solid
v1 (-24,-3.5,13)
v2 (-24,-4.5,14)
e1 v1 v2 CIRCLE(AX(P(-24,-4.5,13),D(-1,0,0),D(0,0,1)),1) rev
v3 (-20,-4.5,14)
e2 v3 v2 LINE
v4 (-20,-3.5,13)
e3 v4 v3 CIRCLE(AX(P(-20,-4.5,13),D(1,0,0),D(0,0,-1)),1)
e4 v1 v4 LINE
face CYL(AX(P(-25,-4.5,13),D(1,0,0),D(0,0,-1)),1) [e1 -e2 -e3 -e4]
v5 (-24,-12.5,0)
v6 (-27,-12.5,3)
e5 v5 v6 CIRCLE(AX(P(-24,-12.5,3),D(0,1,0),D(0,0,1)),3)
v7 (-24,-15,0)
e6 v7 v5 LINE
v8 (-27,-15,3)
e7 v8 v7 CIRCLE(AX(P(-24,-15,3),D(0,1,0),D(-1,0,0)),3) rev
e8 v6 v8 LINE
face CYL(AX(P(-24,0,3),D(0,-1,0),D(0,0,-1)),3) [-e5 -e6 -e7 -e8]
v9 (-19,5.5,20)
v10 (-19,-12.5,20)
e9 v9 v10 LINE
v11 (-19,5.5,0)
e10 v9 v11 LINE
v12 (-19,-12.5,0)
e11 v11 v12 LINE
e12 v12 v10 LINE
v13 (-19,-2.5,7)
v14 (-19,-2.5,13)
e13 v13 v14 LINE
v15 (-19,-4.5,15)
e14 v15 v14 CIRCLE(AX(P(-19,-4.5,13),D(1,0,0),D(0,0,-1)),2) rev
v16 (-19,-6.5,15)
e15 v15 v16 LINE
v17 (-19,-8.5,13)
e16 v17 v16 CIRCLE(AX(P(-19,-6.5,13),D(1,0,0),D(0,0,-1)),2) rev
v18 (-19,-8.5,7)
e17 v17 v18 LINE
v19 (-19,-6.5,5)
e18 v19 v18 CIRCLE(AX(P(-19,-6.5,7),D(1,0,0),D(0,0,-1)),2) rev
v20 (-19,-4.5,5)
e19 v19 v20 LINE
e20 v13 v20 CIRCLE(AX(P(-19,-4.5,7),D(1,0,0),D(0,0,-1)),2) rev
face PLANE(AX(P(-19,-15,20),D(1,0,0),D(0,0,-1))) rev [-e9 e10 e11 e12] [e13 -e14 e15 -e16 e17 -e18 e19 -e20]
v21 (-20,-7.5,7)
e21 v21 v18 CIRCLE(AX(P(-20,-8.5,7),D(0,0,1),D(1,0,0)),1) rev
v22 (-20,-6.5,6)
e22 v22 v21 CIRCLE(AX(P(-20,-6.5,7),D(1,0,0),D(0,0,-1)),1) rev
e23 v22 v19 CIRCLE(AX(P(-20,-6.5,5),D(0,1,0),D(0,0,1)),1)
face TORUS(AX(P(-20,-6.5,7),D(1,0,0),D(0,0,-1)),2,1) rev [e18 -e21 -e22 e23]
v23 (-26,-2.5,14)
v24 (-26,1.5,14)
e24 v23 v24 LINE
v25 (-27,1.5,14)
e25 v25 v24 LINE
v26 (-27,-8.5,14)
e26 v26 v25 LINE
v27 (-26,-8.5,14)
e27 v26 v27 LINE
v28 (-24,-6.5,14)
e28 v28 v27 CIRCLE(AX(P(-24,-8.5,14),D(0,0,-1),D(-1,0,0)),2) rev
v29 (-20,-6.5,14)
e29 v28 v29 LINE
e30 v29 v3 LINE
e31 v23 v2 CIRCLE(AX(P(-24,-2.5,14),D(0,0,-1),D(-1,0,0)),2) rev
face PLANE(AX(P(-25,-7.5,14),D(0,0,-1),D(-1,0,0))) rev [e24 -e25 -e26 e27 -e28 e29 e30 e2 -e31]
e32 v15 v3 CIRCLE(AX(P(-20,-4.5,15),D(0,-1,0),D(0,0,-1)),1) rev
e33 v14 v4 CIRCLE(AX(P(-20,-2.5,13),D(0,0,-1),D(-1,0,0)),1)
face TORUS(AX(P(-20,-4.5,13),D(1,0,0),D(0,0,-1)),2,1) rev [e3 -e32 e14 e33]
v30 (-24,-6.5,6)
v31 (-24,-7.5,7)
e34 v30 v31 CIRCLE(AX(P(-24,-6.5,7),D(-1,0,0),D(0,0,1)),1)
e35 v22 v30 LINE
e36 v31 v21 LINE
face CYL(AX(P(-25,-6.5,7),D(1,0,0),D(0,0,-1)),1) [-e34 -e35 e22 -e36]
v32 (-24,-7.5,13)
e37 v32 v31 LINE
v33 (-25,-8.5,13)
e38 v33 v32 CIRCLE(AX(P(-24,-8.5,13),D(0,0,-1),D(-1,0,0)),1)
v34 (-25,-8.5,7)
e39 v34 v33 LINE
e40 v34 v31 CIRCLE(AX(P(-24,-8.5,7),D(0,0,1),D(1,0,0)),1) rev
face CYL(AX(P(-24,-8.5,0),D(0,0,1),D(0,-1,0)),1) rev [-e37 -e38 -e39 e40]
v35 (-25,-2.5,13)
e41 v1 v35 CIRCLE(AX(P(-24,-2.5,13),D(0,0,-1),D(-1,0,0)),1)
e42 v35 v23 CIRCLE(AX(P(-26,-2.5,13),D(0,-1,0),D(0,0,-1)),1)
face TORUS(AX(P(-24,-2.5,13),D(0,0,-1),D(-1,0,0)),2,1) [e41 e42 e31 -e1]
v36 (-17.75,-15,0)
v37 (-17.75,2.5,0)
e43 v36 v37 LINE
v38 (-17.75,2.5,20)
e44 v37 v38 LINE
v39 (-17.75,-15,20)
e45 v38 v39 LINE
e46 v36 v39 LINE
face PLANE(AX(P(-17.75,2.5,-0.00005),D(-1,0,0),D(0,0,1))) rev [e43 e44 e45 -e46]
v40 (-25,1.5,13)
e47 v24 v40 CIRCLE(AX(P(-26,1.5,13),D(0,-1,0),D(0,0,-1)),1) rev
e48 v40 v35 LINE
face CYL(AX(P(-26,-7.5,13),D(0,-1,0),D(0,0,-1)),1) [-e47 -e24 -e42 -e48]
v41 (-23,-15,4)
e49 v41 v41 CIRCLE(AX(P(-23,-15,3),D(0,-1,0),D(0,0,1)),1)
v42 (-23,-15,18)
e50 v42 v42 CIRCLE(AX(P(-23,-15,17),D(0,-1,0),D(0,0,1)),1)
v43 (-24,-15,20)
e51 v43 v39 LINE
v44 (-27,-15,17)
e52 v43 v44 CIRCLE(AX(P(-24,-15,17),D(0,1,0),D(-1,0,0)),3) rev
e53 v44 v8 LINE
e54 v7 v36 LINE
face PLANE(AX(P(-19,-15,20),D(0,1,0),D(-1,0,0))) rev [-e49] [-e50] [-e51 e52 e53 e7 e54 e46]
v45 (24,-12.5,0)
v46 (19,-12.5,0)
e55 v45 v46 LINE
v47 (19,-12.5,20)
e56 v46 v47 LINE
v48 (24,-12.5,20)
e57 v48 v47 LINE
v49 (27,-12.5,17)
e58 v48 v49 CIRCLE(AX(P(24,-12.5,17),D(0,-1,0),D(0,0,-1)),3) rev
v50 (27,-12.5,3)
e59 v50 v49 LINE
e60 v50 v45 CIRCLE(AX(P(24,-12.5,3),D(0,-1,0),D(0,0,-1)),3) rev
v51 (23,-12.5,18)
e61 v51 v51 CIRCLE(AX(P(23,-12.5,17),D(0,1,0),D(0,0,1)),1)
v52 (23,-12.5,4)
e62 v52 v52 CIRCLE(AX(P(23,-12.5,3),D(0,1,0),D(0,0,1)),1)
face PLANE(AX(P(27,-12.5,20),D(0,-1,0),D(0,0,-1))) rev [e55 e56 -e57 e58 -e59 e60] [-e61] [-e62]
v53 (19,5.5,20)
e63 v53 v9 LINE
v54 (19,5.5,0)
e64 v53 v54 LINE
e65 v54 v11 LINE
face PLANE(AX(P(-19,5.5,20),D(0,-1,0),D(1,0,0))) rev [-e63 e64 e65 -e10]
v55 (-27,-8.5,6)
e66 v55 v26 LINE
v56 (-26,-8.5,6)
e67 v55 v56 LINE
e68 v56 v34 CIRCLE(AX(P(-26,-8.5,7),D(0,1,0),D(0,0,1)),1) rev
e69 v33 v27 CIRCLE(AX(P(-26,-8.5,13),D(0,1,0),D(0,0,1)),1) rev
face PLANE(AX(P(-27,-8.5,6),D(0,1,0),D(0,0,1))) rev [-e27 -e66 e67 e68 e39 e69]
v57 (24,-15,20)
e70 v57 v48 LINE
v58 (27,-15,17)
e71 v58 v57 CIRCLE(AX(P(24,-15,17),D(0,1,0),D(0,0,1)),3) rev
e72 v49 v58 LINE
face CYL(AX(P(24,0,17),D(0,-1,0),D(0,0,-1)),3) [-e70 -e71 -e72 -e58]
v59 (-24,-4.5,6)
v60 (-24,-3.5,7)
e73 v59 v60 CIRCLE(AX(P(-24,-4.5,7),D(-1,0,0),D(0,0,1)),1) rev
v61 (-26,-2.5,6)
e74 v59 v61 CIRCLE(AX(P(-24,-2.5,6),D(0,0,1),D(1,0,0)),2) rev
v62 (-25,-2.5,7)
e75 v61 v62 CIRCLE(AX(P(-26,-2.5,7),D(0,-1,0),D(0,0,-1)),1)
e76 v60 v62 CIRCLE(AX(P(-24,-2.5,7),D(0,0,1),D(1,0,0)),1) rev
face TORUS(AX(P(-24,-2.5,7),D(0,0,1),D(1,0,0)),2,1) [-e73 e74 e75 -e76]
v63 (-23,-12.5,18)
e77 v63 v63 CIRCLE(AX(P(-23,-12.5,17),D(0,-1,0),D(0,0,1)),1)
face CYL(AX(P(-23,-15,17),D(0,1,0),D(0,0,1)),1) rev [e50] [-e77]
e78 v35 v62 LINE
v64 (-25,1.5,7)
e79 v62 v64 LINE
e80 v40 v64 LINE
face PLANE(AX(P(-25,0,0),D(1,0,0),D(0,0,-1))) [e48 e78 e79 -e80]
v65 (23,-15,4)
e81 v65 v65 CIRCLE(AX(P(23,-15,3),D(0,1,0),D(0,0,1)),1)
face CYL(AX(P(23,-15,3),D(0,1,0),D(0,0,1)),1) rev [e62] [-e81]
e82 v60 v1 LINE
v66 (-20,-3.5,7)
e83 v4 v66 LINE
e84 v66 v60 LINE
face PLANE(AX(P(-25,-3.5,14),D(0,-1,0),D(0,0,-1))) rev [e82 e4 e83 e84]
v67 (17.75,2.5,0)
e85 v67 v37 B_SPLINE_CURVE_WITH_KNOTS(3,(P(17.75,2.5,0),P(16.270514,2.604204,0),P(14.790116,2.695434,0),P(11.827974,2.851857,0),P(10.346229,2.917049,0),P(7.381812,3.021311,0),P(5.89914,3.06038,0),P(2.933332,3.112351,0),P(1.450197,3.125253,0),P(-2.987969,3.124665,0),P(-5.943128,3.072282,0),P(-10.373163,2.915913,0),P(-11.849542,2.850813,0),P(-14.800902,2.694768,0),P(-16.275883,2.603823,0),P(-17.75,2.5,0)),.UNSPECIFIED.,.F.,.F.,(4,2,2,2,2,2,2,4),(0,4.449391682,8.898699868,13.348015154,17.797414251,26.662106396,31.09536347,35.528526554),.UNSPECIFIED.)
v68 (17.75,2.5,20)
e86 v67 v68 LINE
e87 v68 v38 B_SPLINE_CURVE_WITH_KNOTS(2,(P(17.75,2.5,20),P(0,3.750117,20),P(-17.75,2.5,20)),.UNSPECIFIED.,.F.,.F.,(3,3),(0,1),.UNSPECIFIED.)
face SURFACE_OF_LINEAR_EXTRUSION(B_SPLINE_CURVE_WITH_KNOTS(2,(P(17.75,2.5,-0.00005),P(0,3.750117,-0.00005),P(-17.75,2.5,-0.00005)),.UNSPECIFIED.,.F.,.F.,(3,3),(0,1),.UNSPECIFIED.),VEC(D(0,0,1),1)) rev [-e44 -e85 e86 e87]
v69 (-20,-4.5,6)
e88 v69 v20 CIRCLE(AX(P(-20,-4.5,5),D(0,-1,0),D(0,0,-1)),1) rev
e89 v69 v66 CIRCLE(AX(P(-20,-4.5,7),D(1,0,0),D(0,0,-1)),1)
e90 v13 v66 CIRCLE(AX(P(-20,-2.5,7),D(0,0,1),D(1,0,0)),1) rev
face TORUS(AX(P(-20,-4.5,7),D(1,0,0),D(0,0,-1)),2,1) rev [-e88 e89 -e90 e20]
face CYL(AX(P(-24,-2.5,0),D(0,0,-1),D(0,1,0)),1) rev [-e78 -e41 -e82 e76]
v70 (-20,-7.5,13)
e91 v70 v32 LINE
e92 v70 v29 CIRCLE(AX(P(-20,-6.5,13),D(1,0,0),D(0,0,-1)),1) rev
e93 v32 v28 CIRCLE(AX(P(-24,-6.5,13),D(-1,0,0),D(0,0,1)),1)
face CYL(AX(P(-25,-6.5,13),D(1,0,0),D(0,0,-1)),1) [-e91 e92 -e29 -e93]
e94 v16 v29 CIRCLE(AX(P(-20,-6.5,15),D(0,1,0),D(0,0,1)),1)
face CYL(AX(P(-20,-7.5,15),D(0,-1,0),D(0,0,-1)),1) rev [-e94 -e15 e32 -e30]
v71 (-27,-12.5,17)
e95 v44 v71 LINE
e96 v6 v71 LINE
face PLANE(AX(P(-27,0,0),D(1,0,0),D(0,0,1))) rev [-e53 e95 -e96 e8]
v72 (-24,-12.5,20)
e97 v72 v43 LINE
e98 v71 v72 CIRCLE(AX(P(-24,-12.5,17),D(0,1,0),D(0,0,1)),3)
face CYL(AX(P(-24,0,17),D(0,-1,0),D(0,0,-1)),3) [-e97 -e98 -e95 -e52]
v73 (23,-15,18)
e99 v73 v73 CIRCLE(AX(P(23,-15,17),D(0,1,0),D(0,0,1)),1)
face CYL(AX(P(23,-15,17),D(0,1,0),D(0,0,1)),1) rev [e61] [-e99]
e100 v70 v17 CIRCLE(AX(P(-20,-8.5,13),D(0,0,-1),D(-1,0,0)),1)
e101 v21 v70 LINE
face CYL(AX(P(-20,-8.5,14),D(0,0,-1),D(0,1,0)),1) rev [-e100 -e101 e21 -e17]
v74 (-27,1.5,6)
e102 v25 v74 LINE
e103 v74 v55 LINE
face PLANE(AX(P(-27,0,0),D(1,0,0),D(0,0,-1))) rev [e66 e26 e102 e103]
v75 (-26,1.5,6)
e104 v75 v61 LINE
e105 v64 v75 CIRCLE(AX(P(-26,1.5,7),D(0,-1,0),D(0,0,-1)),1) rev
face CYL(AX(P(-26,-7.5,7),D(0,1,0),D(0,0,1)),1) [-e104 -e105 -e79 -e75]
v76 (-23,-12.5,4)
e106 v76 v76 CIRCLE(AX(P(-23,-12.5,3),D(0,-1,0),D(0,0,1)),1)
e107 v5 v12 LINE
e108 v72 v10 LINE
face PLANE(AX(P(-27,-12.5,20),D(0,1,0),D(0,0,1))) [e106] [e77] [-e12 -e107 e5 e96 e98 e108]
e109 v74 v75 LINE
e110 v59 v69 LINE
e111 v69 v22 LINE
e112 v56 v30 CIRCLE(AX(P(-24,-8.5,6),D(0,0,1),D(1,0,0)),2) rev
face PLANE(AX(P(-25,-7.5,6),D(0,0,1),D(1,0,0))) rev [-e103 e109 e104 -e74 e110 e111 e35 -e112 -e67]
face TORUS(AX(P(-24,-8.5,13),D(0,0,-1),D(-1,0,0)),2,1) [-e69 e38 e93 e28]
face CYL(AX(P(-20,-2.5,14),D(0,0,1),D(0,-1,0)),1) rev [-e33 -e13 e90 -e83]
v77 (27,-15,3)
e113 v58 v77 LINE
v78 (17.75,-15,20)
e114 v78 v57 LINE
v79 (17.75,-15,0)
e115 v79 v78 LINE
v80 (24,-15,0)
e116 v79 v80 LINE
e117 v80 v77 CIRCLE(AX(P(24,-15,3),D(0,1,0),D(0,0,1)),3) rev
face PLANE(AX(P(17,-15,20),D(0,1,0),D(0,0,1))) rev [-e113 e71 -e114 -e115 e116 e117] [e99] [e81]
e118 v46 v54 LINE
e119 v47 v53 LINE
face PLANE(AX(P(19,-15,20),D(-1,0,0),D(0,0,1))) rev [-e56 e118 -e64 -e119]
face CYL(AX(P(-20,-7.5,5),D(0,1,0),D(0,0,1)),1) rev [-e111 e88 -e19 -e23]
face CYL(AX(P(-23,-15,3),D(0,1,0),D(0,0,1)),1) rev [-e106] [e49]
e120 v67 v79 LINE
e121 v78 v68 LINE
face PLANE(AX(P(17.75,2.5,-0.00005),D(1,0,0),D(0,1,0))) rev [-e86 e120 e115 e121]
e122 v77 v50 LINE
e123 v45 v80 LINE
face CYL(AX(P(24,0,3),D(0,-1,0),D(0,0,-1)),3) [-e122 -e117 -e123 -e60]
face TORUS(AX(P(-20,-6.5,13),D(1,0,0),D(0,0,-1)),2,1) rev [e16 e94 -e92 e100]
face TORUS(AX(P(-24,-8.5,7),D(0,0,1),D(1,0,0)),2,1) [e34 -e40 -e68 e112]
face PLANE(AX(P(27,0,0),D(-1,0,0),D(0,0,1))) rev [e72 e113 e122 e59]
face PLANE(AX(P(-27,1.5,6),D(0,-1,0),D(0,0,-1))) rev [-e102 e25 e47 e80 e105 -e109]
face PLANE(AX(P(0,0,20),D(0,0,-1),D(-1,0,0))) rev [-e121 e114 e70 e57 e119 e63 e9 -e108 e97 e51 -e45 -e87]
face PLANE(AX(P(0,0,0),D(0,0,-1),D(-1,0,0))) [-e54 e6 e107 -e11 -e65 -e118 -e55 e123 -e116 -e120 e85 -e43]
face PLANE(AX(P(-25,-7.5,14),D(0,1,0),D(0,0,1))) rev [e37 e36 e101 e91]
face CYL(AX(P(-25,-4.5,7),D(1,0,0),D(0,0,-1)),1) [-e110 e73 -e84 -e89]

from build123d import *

# Parameters (mm, degrees)
BOSS_EXTRUDE1_DEPTH      = 20
SKETCH2_W                = 20
SKETCH2_H                = 2.5
BOSS_EXTRUDE2_DEPTH      = 8
SKETCH9_R                = 1
CORTE_EXTRUS_O1_DEPTH    = 39.118237105
FILETE1_R                = 3
ESBO_O8_W                = 0.75
ESBO_O8_H                = 17.5
CORTE_EXTRUS_O8_DEPTH    = 37.796738986
CORTE_EXTRUS_O9_DEPTH    = 37.796738986
FILETE1_OF_ESPELHAR1_R   = 3
ESBO_O14_W               = 8
ESBO_O14_H               = 4
RESSALTO_EXTRUS_O2_DEPTH = 6
ESBO_O15_W               = 8
ESBO_O15_H               = 10
RESSALTO_EXTRUS_O3_DEPTH = 2
FILETE3_R                = 1


with BuildPart() as part:
    # Sketch1 → Boss-Extrude1 (new body)
    with BuildSketch(Plane.XY):
        Polygon((17, -15), (19, -15), (19, 5.5), (-19, 5.5), (-19, -15), (-17, -15), (-17, 2.5), (17, 2.5), align=None)
    extrude(amount=BOSS_EXTRUDE1_DEPTH)

    # Sketch2 → Boss-Extrude2 (add)
    with BuildSketch(Plane(origin=(19, 0, 0), x_dir=(0, 0, -1), z_dir=(1, 0, 0))):
        with Locations((-10, -13.75)):
            Rectangle(SKETCH2_W, SKETCH2_H)
    boss_extrude2 = extrude(amount=BOSS_EXTRUDE2_DEPTH)

    # Sketch9 → Corte-extrusão1 (cut, through all)
    with BuildSketch(Plane(origin=(0, -12.5, 0), x_dir=(1, 0, 0), z_dir=(0, 1, 0))):
        with Locations(Location((23, -3, 0), (0, 0, 270))):
            Circle(SKETCH9_R)
        with Locations(Location((23, -17, 0), (0, 0, 270))):
            Circle(SKETCH9_R)
    corte_extrus_o1 = extrude(amount=-CORTE_EXTRUS_O1_DEPTH, mode=Mode.SUBTRACT)

    # Filete1
    filete1_edges = [part.edges().sort_by_distance(p)[0] for p in [
        (27, -13.75, 0),
        (27, -13.75, 20),
    ]]
    fillet(filete1_edges, radius=FILETE1_R)

    # Esboço8 → Corte-extrusão8 (cut, through all)
    with BuildSketch(Plane.XY.offset(20)):
        with Locations((17.375, -6.25)):
            Rectangle(ESBO_O8_W, ESBO_O8_H)
        with Locations((-17.375, -6.25)):
            Rectangle(ESBO_O8_W, ESBO_O8_H)
    extrude(amount=-CORTE_EXTRUS_O8_DEPTH, mode=Mode.SUBTRACT)

    # Esboço11 → Corte-extrusão9 (cut, through all)
    with BuildSketch(Plane.XY.offset(20)):
        with BuildLine():
            Line((-17.75, 2.5), (17.75, 2.5))
            add(Edge.make_bspline(
                [(-17.75, 2.5), (0, 3.750116691), (17.75, 2.5)],
                knots=[0, 0, 0, 1, 1, 1], degree=2))
        make_face()
    extrude(amount=-CORTE_EXTRUS_O9_DEPTH, mode=Mode.SUBTRACT)

    # Espelhar1: Boss-Extrude2, Corte-extrusão1 across plane
    add(boss_extrude2.mirror(Plane(origin=(0, 0, 0), x_dir=(0, 0, 1), z_dir=(1, 0, 0))))
    add(corte_extrus_o1.mirror(Plane(origin=(0, 0, 0), x_dir=(0, 0, 1), z_dir=(1, 0, 0))), mode=Mode.SUBTRACT)

    # Filete1 of Espelhar1
    filete1_of_espelhar1_edges = [part.edges().sort_by_distance(p)[0] for p in [
        (-27, -13.75, 0),
        (-27, -13.75, 20),
    ]]
    fillet(filete1_of_espelhar1_edges, radius=FILETE1_OF_ESPELHAR1_R)

    # Esboço14 → Ressalto-extrusão2 (add)
    with BuildSketch(Plane.ZY.offset(19)):
        with Locations((10, -5.5)):
            Rectangle(ESBO_O14_W, ESBO_O14_H)
    extrude(amount=RESSALTO_EXTRUS_O2_DEPTH)

    # Esboço15 → Ressalto-extrusão3 (add)
    with BuildSketch(Plane.ZY.offset(25)):
        with Locations((10, -3.5)):
            Rectangle(ESBO_O15_W, ESBO_O15_H)
    extrude(amount=RESSALTO_EXTRUS_O3_DEPTH)

    # Filete3
    filete3_edges = [part.edges().sort_by_distance(p)[0] for p in [
        (-19, -5.5, 6),
        (-22, -3.5, 6),
        (-19, -7.5, 10),
        (-22, -7.5, 6),
        (-19, -5.5, 14),
        (-22, -7.5, 14),
        (-19, -3.5, 10),
        (-22, -3.5, 14),
        (-25, -7.5, 10),
        (-25, -3.5, 10),
        (-25, -8, 14),
        (-25, -1, 14),
        (-25, -1, 6),
        (-25, -8, 6),
    ]]
    fillet(filete3_edges, radius=FILETE3_R - 0.0001)  # a hair under: the kernel refuses the full size


solid = part.part
